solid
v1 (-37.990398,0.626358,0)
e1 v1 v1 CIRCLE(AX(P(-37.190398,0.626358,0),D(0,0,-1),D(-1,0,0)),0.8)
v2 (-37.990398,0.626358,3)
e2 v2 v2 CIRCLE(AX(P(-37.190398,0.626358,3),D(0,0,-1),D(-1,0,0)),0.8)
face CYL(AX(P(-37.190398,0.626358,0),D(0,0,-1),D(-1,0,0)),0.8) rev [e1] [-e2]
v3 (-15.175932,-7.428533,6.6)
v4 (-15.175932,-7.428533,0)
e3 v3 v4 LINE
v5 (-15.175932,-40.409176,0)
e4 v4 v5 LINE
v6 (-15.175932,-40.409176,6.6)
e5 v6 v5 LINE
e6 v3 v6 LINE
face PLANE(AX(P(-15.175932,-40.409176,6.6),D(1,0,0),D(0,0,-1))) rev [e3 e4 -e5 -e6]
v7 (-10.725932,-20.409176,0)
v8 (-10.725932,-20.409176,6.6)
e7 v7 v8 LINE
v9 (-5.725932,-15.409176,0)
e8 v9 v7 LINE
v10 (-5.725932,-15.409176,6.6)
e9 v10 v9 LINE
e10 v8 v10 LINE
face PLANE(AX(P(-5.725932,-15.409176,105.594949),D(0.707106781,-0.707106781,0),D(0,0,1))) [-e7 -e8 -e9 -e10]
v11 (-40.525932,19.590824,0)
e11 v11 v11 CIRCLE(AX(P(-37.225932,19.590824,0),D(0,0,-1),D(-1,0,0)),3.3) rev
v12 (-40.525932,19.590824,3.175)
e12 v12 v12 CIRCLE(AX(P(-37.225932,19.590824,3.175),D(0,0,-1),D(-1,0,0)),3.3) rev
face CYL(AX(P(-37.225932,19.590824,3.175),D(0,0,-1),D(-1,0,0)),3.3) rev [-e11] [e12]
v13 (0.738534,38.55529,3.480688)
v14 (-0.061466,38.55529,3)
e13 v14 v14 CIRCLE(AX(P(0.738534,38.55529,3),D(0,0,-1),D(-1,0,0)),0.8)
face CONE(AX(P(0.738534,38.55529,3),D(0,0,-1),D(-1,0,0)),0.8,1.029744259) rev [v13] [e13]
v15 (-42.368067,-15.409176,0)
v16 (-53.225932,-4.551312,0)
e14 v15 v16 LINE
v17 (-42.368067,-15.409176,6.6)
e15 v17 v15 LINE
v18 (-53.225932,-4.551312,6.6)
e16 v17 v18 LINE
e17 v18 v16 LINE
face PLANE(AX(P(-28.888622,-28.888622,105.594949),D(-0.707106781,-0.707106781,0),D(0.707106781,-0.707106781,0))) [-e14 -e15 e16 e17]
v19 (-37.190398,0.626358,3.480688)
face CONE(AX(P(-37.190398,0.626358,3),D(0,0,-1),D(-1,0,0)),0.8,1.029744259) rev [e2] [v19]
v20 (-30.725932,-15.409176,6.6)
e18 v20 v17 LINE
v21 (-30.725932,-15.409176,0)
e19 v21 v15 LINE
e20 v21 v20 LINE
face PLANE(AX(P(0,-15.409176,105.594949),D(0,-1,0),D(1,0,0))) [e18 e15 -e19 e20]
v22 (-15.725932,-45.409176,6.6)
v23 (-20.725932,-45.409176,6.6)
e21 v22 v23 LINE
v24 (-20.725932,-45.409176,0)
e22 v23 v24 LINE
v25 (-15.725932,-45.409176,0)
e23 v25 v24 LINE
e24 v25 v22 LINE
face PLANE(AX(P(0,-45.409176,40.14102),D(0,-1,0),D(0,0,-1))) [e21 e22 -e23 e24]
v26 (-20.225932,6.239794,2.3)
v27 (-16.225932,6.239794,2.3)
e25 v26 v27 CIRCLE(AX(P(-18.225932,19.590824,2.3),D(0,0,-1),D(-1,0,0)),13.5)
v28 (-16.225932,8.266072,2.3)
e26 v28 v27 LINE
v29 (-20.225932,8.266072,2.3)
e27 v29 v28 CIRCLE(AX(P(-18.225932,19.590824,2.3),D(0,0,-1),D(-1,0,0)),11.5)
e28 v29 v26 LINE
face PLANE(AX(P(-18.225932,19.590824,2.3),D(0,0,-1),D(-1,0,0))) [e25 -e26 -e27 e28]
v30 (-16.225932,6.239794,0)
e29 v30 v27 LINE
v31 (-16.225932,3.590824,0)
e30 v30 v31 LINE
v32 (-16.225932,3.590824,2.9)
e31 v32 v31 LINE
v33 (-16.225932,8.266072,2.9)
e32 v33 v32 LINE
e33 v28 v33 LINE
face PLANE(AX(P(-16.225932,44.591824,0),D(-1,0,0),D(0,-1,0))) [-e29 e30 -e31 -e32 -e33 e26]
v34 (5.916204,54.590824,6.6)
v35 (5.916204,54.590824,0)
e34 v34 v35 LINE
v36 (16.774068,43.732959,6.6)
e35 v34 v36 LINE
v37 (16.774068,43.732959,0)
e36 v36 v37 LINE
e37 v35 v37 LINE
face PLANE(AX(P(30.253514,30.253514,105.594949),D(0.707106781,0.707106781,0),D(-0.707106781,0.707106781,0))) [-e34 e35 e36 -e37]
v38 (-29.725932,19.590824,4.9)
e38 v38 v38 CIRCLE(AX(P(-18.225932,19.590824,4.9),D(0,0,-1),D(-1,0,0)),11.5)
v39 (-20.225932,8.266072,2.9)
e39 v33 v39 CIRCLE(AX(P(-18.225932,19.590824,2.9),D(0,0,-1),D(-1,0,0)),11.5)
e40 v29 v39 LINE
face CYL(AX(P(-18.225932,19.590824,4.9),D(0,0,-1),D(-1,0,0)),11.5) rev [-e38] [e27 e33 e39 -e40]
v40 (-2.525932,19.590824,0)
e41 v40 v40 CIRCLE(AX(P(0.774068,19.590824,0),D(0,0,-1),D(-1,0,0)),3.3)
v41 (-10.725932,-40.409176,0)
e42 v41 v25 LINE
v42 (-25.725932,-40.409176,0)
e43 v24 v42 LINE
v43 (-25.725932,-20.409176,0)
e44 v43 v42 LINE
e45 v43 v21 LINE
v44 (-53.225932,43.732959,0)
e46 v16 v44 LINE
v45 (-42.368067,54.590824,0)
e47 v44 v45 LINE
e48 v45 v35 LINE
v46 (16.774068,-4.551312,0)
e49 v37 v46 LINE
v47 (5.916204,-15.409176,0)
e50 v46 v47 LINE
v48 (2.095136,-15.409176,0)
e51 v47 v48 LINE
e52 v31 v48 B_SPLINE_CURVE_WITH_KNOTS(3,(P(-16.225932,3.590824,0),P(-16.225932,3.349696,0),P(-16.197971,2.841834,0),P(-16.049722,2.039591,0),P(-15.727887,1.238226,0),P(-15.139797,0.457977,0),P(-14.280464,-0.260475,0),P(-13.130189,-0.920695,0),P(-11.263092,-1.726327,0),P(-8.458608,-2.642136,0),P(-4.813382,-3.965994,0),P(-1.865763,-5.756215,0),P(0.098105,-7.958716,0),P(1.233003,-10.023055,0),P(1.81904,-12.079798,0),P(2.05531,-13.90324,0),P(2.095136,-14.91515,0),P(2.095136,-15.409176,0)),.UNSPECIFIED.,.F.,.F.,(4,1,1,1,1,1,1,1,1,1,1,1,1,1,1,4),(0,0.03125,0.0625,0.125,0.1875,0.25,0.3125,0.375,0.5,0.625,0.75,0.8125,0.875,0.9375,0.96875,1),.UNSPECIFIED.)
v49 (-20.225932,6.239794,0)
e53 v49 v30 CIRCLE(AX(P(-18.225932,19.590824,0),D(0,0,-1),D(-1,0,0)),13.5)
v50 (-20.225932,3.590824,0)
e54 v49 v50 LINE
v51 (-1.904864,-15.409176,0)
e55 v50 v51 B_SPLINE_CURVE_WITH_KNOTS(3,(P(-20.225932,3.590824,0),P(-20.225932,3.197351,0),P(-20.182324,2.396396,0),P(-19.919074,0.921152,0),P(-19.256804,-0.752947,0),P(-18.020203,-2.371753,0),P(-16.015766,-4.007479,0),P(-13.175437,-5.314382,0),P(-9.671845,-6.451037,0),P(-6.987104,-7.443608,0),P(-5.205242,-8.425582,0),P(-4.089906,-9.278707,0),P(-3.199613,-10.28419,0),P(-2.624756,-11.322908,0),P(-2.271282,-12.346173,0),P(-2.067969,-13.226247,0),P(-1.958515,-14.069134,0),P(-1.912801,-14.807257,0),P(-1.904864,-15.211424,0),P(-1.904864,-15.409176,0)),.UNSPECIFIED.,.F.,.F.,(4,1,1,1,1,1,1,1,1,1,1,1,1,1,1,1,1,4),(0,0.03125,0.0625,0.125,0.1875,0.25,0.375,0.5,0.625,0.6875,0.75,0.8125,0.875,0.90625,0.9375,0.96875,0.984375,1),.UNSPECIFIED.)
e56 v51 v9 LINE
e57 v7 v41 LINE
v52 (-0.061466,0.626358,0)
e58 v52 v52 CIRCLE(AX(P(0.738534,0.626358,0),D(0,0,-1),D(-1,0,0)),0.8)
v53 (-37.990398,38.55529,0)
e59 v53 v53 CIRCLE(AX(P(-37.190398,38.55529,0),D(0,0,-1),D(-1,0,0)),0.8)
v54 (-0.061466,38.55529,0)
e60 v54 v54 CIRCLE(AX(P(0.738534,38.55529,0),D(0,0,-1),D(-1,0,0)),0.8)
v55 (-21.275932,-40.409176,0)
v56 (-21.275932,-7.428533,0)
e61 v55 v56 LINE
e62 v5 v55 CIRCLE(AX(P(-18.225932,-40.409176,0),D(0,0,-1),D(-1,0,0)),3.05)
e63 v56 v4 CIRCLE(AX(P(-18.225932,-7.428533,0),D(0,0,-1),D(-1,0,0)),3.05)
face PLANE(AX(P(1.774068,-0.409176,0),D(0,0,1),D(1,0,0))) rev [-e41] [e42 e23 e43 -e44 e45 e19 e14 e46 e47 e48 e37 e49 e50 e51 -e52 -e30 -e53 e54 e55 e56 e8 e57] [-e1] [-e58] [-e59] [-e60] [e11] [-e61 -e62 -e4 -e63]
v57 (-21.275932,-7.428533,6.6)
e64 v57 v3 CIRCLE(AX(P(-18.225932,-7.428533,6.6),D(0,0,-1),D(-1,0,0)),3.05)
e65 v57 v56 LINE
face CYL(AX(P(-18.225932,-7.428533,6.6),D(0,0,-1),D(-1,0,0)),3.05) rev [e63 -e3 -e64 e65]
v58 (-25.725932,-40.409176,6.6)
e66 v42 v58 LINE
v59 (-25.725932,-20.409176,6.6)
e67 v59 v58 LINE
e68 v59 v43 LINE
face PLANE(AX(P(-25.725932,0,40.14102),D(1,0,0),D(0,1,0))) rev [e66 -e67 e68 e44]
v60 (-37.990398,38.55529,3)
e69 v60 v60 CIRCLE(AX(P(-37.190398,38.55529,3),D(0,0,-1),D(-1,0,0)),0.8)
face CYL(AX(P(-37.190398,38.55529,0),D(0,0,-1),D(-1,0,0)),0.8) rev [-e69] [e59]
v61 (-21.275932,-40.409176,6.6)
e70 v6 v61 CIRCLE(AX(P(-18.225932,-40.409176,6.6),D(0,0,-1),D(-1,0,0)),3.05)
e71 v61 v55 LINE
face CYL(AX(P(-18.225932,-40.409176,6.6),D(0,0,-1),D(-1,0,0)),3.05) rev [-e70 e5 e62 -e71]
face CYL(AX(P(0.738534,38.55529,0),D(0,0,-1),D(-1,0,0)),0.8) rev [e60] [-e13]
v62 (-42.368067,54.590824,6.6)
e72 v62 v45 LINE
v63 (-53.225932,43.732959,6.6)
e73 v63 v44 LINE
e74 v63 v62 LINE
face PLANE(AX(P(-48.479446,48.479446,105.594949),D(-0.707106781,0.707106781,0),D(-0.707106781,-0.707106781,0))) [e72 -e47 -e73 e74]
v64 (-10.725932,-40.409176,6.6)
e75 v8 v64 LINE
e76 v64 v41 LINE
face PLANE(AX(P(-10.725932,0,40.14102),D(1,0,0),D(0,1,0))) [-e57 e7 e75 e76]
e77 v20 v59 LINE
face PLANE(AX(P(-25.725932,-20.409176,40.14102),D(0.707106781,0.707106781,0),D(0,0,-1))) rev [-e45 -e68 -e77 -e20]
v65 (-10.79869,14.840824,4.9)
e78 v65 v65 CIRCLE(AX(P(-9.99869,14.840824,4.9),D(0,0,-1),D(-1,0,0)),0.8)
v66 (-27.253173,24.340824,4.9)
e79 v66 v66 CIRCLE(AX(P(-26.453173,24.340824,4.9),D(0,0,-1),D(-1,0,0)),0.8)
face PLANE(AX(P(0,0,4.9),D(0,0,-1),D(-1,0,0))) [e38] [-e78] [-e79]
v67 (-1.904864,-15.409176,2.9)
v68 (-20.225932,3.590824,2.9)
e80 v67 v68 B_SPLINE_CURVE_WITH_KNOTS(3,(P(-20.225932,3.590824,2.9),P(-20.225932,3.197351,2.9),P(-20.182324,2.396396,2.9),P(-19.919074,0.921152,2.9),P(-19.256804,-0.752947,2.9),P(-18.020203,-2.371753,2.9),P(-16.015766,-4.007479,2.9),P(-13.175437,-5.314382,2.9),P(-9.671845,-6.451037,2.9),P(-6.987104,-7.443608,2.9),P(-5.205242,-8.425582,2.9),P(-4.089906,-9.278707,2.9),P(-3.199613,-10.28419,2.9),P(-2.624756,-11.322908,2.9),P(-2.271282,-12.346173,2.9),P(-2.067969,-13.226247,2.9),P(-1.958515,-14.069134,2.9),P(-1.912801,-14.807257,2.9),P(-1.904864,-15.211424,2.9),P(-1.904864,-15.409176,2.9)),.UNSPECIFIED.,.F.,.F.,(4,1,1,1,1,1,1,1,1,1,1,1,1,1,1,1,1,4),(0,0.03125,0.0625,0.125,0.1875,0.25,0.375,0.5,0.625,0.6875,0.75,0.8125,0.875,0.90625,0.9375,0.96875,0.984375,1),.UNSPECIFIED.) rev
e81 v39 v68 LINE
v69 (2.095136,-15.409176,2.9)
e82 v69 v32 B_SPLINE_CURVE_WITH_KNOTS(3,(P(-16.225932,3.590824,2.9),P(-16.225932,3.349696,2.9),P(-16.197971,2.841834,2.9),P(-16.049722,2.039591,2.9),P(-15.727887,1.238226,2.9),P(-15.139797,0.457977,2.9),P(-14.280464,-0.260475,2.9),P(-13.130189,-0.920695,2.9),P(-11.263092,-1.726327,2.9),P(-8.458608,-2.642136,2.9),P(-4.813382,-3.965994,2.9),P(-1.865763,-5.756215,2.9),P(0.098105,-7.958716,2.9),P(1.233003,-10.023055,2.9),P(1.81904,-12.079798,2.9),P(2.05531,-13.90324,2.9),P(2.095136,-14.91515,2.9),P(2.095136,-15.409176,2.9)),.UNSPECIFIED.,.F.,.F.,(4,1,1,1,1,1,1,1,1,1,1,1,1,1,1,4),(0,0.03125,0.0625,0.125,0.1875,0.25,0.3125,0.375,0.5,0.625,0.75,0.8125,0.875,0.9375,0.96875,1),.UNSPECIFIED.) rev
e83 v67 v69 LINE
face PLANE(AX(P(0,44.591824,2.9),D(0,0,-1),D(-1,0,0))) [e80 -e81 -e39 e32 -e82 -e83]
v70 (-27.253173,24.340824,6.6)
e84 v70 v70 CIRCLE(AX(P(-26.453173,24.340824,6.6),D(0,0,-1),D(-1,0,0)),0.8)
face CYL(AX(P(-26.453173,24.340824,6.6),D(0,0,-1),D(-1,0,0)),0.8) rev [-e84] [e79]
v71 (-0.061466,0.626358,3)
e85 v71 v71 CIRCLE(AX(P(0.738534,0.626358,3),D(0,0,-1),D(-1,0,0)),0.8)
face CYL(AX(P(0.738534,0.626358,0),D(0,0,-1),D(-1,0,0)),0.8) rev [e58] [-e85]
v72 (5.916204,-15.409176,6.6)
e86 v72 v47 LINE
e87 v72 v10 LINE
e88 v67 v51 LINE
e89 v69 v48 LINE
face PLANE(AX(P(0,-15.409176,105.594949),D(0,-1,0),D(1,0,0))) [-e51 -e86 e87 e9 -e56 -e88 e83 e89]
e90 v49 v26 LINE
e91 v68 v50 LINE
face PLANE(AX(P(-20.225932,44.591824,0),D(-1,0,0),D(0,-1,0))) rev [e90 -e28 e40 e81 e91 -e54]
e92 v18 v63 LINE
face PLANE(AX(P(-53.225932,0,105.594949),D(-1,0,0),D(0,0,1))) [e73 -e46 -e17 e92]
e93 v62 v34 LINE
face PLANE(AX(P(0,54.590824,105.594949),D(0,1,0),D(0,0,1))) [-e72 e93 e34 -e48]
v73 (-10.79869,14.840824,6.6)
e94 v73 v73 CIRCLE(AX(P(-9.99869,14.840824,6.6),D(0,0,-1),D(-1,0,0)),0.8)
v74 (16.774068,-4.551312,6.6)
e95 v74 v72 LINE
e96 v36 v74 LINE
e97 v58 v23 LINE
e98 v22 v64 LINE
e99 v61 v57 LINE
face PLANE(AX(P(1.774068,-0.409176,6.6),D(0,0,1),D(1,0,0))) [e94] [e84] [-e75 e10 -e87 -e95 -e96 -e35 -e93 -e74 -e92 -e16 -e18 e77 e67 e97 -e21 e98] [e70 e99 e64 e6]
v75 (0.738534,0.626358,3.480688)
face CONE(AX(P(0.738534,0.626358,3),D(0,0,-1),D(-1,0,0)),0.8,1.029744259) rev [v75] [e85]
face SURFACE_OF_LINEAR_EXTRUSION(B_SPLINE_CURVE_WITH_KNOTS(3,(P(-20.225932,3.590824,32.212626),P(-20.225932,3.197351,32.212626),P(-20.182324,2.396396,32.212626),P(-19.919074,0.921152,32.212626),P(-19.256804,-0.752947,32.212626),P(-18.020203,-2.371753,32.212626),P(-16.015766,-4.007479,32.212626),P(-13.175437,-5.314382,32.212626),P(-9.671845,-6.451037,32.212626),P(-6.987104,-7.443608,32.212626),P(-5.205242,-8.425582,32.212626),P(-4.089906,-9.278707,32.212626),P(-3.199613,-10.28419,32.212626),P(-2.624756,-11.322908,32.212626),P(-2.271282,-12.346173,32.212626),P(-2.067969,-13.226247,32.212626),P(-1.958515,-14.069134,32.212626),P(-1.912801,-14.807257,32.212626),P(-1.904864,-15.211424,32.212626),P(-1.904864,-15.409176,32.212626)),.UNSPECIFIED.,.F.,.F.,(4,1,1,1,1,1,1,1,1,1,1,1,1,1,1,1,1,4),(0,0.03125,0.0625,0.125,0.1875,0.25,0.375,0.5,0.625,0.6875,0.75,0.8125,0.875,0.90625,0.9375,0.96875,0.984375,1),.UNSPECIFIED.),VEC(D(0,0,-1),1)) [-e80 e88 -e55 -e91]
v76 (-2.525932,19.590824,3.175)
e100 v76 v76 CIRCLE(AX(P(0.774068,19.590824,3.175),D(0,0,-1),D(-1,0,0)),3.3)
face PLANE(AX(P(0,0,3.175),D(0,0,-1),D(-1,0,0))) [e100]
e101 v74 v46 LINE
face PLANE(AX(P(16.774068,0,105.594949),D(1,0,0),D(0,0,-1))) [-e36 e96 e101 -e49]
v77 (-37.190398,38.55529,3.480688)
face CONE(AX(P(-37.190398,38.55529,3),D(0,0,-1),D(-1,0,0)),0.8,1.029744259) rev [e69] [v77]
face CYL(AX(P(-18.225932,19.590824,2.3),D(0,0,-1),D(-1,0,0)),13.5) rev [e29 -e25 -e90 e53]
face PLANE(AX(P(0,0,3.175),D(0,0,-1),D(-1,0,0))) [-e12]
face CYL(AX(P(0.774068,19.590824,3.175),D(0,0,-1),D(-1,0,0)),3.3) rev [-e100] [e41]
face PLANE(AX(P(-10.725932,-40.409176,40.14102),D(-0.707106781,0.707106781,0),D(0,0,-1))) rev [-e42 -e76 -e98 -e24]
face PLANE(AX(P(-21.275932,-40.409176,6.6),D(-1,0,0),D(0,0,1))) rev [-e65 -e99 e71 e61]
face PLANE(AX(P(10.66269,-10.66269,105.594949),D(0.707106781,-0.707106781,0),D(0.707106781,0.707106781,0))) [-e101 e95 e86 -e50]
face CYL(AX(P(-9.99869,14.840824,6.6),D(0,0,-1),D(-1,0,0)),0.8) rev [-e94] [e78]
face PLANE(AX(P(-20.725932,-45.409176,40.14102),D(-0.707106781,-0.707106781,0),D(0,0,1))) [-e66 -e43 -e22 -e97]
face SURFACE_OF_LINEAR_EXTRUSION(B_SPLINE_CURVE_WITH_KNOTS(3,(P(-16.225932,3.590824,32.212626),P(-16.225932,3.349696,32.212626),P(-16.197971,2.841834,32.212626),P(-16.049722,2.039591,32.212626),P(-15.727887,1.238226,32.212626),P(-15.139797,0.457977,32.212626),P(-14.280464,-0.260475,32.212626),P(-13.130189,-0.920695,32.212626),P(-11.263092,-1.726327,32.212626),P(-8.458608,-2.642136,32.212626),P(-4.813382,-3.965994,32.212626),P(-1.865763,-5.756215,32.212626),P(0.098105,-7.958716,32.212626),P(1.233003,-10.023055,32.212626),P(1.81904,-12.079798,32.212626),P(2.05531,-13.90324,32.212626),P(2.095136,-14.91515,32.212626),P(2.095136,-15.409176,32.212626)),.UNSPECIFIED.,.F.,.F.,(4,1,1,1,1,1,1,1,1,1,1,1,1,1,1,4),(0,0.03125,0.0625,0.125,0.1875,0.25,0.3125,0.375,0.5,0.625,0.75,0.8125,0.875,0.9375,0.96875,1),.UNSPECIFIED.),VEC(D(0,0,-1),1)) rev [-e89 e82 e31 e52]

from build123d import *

# Parameters (mm, degrees)
BOSS_EXTRUDE1_DEPTH             = 6.6
SKETCH4_R                       = 11.5
CUT_EXTRUDE2_DEPTH              = 4.9
SKETCH5_R                       = 13.5
SKETCH5_R_2                     = 11.5
CUT_EXTRUDE3_DEPTH              = 2.3
SKETCH12_R                      = 0.8
CUT_EXTRUDE5_DEPTH              = 63.296330123
CUT_EXTRUDE6_DEPTH              = 10
CUT_EXTRUDE7_REACH              = 68.423
SKETCH18_W                      = 2
SKETCH18_H                      = 2.9
SKETCH19_W                      = 5.7
SKETCH19_H                      = 5
CUT_EXTRUDE8_DEPTH              = 9
CUT_EXTRUDE9_DEPTH              = 3.175
BOSS_EXTRUDE2_DEPTH             = 6.6
BOSS_EXTRUDE3_DEPTH             = 10.5
TAP_DRILL_FOR_M2X0_4_TAP1_D     = 1.6
TAP_DRILL_FOR_M2X0_4_TAP1_DEPTH = 3
TAP_DRILL_FOR_M2X0_4_TAP1_TIP   = 0.480688495
SKETCH27_W                      = 15
SKETCH27_H                      = 30
BOSS_EXTRUDE4_DEPTH             = 6.6
SKETCH28_W                      = 15
SKETCH28_H                      = 19
BOSS_EXTRUDE5_DEPTH             = 6.6
CUT_EXTRUDE11_DEPTH             = 77.52919612
CHAMFER1_SIZE                   = 5
CUT_EXTRUDE12_START             = -2.9
CUT_EXTRUDE12_DEPTH             = 2.9


# Read off the part's stored shape, not the designer's step: Cut-Extrude12
with BuildPart() as part:
    # Sketch2 → Boss-Extrude1 (new body)
    with BuildSketch(Plane.XY):
        with BuildLine():
            Line((-38.225931781, 44.590823815), (1.774068219, 44.590823815))
            ThreePointArc((1.774068219, 44.590823815), (5.309602125, 43.126357721), (6.774068219, 39.590823815))
            Line((6.774068219, 39.590823815), (6.774068219, -0.409176185))
            ThreePointArc((6.774068219, -0.409176185), (5.309602125, -3.944710091), (1.774068219, -5.409176185))
            Line((1.774068219, -5.409176185), (-38.225931781, -5.409176185))
            ThreePointArc((-38.225931781, -5.409176185), (-41.761465687, -3.944710091), (-43.225931781, -0.409176185))
            Line((-43.225931781, -0.409176185), (-43.225931781, 39.590823815))
            ThreePointArc((-43.225931781, 39.590823815), (-41.761465687, 43.126357721), (-38.225931781, 44.590823815))
        make_face()
    extrude(amount=BOSS_EXTRUDE1_DEPTH)

    # Sketch4 → Cut-Extrude2 (cut)
    with BuildSketch(Plane(origin=(0, 0, 0), x_dir=(-1, 0, 0), z_dir=(0, 0, -1))):
        with Locations((18.225931781, 19.590823815)):
            Circle(SKETCH4_R)
    extrude(amount=-CUT_EXTRUDE2_DEPTH, mode=Mode.SUBTRACT)

    # Sketch5 → Cut-Extrude3 (cut)
    with BuildSketch(Plane(origin=(0, 0, 0), x_dir=(-1, 0, 0), z_dir=(0, 0, -1))):
        with Locations((18.225931781, 19.590823815)):
            Circle(SKETCH5_R)
        with Locations((18.225931781, 19.590823815)):
            Circle(SKETCH5_R_2, mode=Mode.SUBTRACT)
    extrude(amount=-CUT_EXTRUDE3_DEPTH, mode=Mode.SUBTRACT)

    # Sketch12 → Cut-Extrude5 (cut, through all)
    with BuildSketch(Plane(origin=(0, 0, 4.9), x_dir=(-1, 0, 0), z_dir=(0, 0, -1))):
        with Locations((26.453173117, 24.340823815)):
            Circle(SKETCH12_R)
        with Locations((9.998690445, 14.840823815)):
            Circle(SKETCH12_R)
    extrude(amount=-CUT_EXTRUDE5_DEPTH, mode=Mode.SUBTRACT)

    # Sketch13 → Cut-Extrude6 (cut)
    with BuildSketch(Plane(origin=(0, 0, 0), x_dir=(-1, 0, 0), z_dir=(0, 0, -1))):
        with BuildLine():
            Line((-6.774068219, 39.590823815), (-1.774068219, 44.590823815))
            ThreePointArc((-1.774068219, 44.590823815), (-5.309602125, 43.126357721), (-6.774068219, 39.590823815))
        make_face()
        with BuildLine():
            Line((-6.774068219, -0.409176185), (-1.774068219, -5.409176185))
            ThreePointArc((-1.774068219, -5.409176185), (-5.309602125, -3.944710091), (-6.774068219, -0.409176185))
        make_face()
        with BuildLine():
            Line((43.225931781, -0.409176185), (38.225931781, -5.409176185))
            ThreePointArc((38.225931781, -5.409176185), (41.761465687, -3.944710091), (43.225931781, -0.409176185))
        make_face()
        with BuildLine():
            Line((38.225931781, 44.590823815), (43.225931781, 39.590823815))
            ThreePointArc((43.225931781, 39.590823815), (41.761465687, 43.126357721), (38.225931781, 44.590823815))
        make_face()
    extrude(amount=-CUT_EXTRUDE6_DEPTH, mode=Mode.SUBTRACT)

    # Sketch18 → Cut-Extrude7 (cut, up to next)
    with BuildSketch(Plane.XZ.offset(5.409176185), mode=Mode.PRIVATE) as cut_extrude7_sk1:
        with Locations((-17.225931781, 1.45)):
            Rectangle(SKETCH18_W, SKETCH18_H)
    cut_extrude7_tool1 = extrude(cut_extrude7_sk1.sketch, amount=-CUT_EXTRUDE7_REACH, mode=Mode.PRIVATE) & part.part
    # Sketch18 → Cut-Extrude7 (cut, up to next)
    with BuildSketch(Plane.XZ.offset(5.409176185), mode=Mode.PRIVATE) as cut_extrude7_sk2:
        with Locations((-19.225931781, 1.45)):
            Rectangle(SKETCH18_W, SKETCH18_H)
    cut_extrude7_tool2 = extrude(cut_extrude7_sk2.sketch, amount=-CUT_EXTRUDE7_REACH, mode=Mode.PRIVATE) & part.part
    add(cut_extrude7_tool1.solids().sort_by_distance((-17.225932, -5.409176, 1.45))[0], mode=Mode.SUBTRACT)
    add(cut_extrude7_tool2.solids().sort_by_distance((-19.225932, -5.409176, 1.45))[0], mode=Mode.SUBTRACT)

    # Sketch19 → Cut-Extrude8 (cut)
    with BuildSketch(Plane.XZ.offset(5.409176185)):
        with Locations((-18.225931781, 2.5)):
            Rectangle(SKETCH19_W, SKETCH19_H)
    extrude(amount=-CUT_EXTRUDE8_DEPTH, mode=Mode.SUBTRACT)

    # Sketch20 → Cut-Extrude9 (cut)
    with BuildSketch(Plane(origin=(0, 0, 0), x_dir=(-1, 0, 0), z_dir=(0, 0, -1))):
        with BuildLine():
            ThreePointArc((2.525931781, 19.590823815), (-0.774068219, 22.890823815), (-4.074068219, 19.590823815))
            Line((-4.074068219, 19.590823815), (-0.774068219, 19.590823815))
            Line((-0.774068219, 19.590823815), (2.525931781, 19.590823815))
        make_face()
        with BuildLine():
            Line((-0.774068219, 19.590823815), (-4.074068219, 19.590823815))
            ThreePointArc((-4.074068219, 19.590823815), (-0.774068219, 16.290823815), (2.525931781, 19.590823815))
            Line((2.525931781, 19.590823815), (-0.774068219, 19.590823815))
        make_face()
        with BuildLine():
            ThreePointArc((33.925931781, 19.590823815), (37.225931781, 16.290823815), (40.525931781, 19.590823815))
            Line((40.525931781, 19.590823815), (37.225931781, 19.590823815))
            Line((37.225931781, 19.590823815), (33.925931781, 19.590823815))
        make_face()
        with BuildLine():
            Line((37.225931781, 19.590823815), (40.525931781, 19.590823815))
            ThreePointArc((40.525931781, 19.590823815), (37.225931781, 22.890823815), (33.925931781, 19.590823815))
            Line((33.925931781, 19.590823815), (37.225931781, 19.590823815))
        make_face()
    extrude(amount=-CUT_EXTRUDE9_DEPTH, mode=Mode.SUBTRACT)

    # Sketch21 → Boss-Extrude2 (add)
    with BuildSketch(Plane(origin=(0, 0, 0), x_dir=(-1, 0, 0), z_dir=(0, 0, -1))):
        with BuildLine():
            Line((15.375931781, -5.409176185), (-1.774068219, -5.409176185))
            Line((-1.774068219, -5.409176185), (-6.774068219, -0.409176185))
            Line((-6.774068219, -0.409176185), (-6.774068219, 39.590823815))
            Line((-6.774068219, 39.590823815), (-1.774068219, 44.590823815))
            Line((-1.774068219, 44.590823815), (38.225931781, 44.590823815))
            Line((38.225931781, 44.590823815), (43.225931781, 39.590823815))
            Line((43.225931781, 39.590823815), (43.225931781, -0.409176185))
            Line((43.225931781, -0.409176185), (38.225931781, -5.409176185))
            Line((38.225931781, -5.409176185), (21.075931781, -5.409176185))
            Line((21.075931781, -5.409176185), (21.075931781, -14.409176185))
            ThreePointArc((21.075931781, -14.409176185), (21.368825, -15.116282966), (22.075931781, -15.409176185))
            Line((22.075931781, -15.409176185), (42.368067404, -15.409176185))
            Line((42.368067404, -15.409176185), (53.225931781, -4.551311808))
            Line((53.225931781, -4.551311808), (53.225931781, 43.732959439))
            Line((53.225931781, 43.732959439), (42.368067404, 54.590823815))
            Line((42.368067404, 54.590823815), (-5.916203843, 54.590823815))
            Line((-5.916203843, 54.590823815), (-16.774068219, 43.732959439))
            Line((-16.774068219, 43.732959439), (-16.774068219, -4.551311808))
            Line((-16.774068219, -4.551311808), (-5.916203843, -15.409176185))
            Line((-5.916203843, -15.409176185), (14.375931781, -15.409176185))
            ThreePointArc((14.375931781, -15.409176185), (15.083038562, -15.116282966), (15.375931781, -14.409176185))
            Line((15.375931781, -14.409176185), (15.375931781, -5.409176185))
        make_face()
    extrude(amount=-BOSS_EXTRUDE2_DEPTH)

    # Sketch23 → Boss-Extrude3 (add)
    with BuildSketch(Plane.XZ.offset(-3.590823815)):
        Polygon((-15.375931781, 5), (-21.075931781, 5), (-21.075931781, 0), (-20.225931781, 0), (-20.225931781, 2.9), (-16.225931781, 2.9), (-16.225931781, 0), (-15.375931781, 0), align=None)
    extrude(amount=BOSS_EXTRUDE3_DEPTH)

    # Tap Drill for M2x0.4 Tap1
    with Locations(Plane(origin=(0.738534313, 0.626357721, 0), x_dir=(-1, 0, 0), z_dir=(0, 0, -1))):
        with Locations((0, 0), (0, 37.928932188), (37.928932188, 0), (37.928932188, 37.928932188)):
            Hole(TAP_DRILL_FOR_M2X0_4_TAP1_D / 2, depth=TAP_DRILL_FOR_M2X0_4_TAP1_DEPTH)
            with Locations((0, 0, -(TAP_DRILL_FOR_M2X0_4_TAP1_DEPTH + TAP_DRILL_FOR_M2X0_4_TAP1_TIP / 2))):  # 118° drill point
                Cone(0, TAP_DRILL_FOR_M2X0_4_TAP1_D / 2, TAP_DRILL_FOR_M2X0_4_TAP1_TIP, mode=Mode.SUBTRACT)

    # Sketch27 → Boss-Extrude4 (add)
    with BuildSketch(Plane(origin=(0, 0, 0), x_dir=(-1, 0, 0), z_dir=(0, 0, -1))):
        with Locations((18.225931781, -30.409176185)):
            Rectangle(SKETCH27_W, SKETCH27_H)
    extrude(amount=-BOSS_EXTRUDE4_DEPTH)

    # Sketch28 → Boss-Extrude5 (add)
    with BuildSketch(Plane(origin=(0, 0, 0), x_dir=(-1, 0, 0), z_dir=(0, 0, -1))):
        with Locations((18.225931781, -5.909176185)):
            Rectangle(SKETCH28_W, SKETCH28_H)
    extrude(amount=-BOSS_EXTRUDE5_DEPTH)

    # Sketch29 → Cut-Extrude11 (cut, through all)
    with BuildSketch(Plane(origin=(0, 0, 0), x_dir=(-1, 0, 0), z_dir=(0, 0, -1))):
        with BuildLine():
            Line((15.175931781, -40.409176185), (15.175931781, -7.428532511))
            ThreePointArc((15.175931781, -7.428532511), (18.225931781, -4.378532511), (21.275931781, -7.428532511))
            Line((21.275931781, -7.428532511), (21.275931781, -40.409176185))
            ThreePointArc((21.275931781, -40.409176185), (18.225931781, -43.459176185), (15.175931781, -40.409176185))
        make_face()
    extrude(amount=-CUT_EXTRUDE11_DEPTH, mode=Mode.SUBTRACT)

    # Chamfer1
    chamfer1_edges = [part.edges().sort_by_distance(p)[0] for p in [
        (-25.725931781, -15.409176185, 3.3),
        (-25.725931781, -45.409176185, 3.3),
        (-10.725931781, -45.409176185, 3.3),
        (-10.725931781, -15.409176185, 3.3),
    ]]
    chamfer(chamfer1_edges, length=CHAMFER1_SIZE)

    # Cut-Extrude12 outline → Cut-Extrude12 (cut)
    with BuildSketch(Plane(origin=(0, 0, 0), x_dir=(-1, 0, 0), z_dir=(0, 0, -1)).offset(CUT_EXTRUDE12_START)):
        with BuildLine():
            add(Edge.make_bspline(
                [(20.225931781, 3.590823815), (20.225931781, 3.197350565), (20.182324291, 2.396395622), (19.919073848, 0.921152326), (19.256804009, -0.752947143), (18.020202718, -2.371752636), (16.0157657, -4.007478883), (13.175437439, -5.314382158), (9.671845103, -6.45103665), (6.987103918, -7.443607584), (5.205242074, -8.425581774), (4.089906326, -9.278706893), (3.199613192, -10.284190015), (2.624756347, -11.322907692), (2.27128167, -12.346173133), (2.067968688, -13.226247217), (1.958515289, -14.069133971), (1.912800936, -14.807256698), (1.904863969, -15.21142357), (1.904863969, -15.409176185)],
                knots=[0, 0, 0, 0, 0.03125, 0.0625, 0.125, 0.1875, 0.25, 0.375, 0.5, 0.625, 0.6875, 0.75, 0.8125, 0.875, 0.90625, 0.9375, 0.96875, 0.984375, 1, 1, 1, 1], degree=3))
            Line((20.225931781, 3.590823815), (16.225931781, 3.590823815))
            add(Edge.make_bspline(
                [(16.225931781, 3.590823815), (16.225931781, 3.349695771), (16.197971207, 2.841833913), (16.049721647, 2.039591017), (15.72788709, 1.23822648), (15.139797291, 0.457977067), (14.280464012, -0.260475455), (13.130188953, -0.920694884), (11.263091636, -1.726327354), (8.458607531, -2.642136424), (4.813382385, -3.965993877), (1.865762572, -5.756214715), (-0.098104505, -7.958715934), (-1.233002962, -10.023055027), (-1.819039575, -12.079797564), (-2.055309799, -13.903240173), (-2.095136031, -14.915149533), (-2.095136031, -15.409176185)],
                knots=[0, 0, 0, 0, 0.03125, 0.0625, 0.125, 0.1875, 0.25, 0.3125, 0.375, 0.5, 0.625, 0.75, 0.8125, 0.875, 0.9375, 0.96875, 1, 1, 1, 1], degree=3))
            Line((-2.095136031, -15.409176185), (1.904863969, -15.409176185))
        make_face()
    extrude(amount=CUT_EXTRUDE12_DEPTH, mode=Mode.SUBTRACT)


solid = part.part
